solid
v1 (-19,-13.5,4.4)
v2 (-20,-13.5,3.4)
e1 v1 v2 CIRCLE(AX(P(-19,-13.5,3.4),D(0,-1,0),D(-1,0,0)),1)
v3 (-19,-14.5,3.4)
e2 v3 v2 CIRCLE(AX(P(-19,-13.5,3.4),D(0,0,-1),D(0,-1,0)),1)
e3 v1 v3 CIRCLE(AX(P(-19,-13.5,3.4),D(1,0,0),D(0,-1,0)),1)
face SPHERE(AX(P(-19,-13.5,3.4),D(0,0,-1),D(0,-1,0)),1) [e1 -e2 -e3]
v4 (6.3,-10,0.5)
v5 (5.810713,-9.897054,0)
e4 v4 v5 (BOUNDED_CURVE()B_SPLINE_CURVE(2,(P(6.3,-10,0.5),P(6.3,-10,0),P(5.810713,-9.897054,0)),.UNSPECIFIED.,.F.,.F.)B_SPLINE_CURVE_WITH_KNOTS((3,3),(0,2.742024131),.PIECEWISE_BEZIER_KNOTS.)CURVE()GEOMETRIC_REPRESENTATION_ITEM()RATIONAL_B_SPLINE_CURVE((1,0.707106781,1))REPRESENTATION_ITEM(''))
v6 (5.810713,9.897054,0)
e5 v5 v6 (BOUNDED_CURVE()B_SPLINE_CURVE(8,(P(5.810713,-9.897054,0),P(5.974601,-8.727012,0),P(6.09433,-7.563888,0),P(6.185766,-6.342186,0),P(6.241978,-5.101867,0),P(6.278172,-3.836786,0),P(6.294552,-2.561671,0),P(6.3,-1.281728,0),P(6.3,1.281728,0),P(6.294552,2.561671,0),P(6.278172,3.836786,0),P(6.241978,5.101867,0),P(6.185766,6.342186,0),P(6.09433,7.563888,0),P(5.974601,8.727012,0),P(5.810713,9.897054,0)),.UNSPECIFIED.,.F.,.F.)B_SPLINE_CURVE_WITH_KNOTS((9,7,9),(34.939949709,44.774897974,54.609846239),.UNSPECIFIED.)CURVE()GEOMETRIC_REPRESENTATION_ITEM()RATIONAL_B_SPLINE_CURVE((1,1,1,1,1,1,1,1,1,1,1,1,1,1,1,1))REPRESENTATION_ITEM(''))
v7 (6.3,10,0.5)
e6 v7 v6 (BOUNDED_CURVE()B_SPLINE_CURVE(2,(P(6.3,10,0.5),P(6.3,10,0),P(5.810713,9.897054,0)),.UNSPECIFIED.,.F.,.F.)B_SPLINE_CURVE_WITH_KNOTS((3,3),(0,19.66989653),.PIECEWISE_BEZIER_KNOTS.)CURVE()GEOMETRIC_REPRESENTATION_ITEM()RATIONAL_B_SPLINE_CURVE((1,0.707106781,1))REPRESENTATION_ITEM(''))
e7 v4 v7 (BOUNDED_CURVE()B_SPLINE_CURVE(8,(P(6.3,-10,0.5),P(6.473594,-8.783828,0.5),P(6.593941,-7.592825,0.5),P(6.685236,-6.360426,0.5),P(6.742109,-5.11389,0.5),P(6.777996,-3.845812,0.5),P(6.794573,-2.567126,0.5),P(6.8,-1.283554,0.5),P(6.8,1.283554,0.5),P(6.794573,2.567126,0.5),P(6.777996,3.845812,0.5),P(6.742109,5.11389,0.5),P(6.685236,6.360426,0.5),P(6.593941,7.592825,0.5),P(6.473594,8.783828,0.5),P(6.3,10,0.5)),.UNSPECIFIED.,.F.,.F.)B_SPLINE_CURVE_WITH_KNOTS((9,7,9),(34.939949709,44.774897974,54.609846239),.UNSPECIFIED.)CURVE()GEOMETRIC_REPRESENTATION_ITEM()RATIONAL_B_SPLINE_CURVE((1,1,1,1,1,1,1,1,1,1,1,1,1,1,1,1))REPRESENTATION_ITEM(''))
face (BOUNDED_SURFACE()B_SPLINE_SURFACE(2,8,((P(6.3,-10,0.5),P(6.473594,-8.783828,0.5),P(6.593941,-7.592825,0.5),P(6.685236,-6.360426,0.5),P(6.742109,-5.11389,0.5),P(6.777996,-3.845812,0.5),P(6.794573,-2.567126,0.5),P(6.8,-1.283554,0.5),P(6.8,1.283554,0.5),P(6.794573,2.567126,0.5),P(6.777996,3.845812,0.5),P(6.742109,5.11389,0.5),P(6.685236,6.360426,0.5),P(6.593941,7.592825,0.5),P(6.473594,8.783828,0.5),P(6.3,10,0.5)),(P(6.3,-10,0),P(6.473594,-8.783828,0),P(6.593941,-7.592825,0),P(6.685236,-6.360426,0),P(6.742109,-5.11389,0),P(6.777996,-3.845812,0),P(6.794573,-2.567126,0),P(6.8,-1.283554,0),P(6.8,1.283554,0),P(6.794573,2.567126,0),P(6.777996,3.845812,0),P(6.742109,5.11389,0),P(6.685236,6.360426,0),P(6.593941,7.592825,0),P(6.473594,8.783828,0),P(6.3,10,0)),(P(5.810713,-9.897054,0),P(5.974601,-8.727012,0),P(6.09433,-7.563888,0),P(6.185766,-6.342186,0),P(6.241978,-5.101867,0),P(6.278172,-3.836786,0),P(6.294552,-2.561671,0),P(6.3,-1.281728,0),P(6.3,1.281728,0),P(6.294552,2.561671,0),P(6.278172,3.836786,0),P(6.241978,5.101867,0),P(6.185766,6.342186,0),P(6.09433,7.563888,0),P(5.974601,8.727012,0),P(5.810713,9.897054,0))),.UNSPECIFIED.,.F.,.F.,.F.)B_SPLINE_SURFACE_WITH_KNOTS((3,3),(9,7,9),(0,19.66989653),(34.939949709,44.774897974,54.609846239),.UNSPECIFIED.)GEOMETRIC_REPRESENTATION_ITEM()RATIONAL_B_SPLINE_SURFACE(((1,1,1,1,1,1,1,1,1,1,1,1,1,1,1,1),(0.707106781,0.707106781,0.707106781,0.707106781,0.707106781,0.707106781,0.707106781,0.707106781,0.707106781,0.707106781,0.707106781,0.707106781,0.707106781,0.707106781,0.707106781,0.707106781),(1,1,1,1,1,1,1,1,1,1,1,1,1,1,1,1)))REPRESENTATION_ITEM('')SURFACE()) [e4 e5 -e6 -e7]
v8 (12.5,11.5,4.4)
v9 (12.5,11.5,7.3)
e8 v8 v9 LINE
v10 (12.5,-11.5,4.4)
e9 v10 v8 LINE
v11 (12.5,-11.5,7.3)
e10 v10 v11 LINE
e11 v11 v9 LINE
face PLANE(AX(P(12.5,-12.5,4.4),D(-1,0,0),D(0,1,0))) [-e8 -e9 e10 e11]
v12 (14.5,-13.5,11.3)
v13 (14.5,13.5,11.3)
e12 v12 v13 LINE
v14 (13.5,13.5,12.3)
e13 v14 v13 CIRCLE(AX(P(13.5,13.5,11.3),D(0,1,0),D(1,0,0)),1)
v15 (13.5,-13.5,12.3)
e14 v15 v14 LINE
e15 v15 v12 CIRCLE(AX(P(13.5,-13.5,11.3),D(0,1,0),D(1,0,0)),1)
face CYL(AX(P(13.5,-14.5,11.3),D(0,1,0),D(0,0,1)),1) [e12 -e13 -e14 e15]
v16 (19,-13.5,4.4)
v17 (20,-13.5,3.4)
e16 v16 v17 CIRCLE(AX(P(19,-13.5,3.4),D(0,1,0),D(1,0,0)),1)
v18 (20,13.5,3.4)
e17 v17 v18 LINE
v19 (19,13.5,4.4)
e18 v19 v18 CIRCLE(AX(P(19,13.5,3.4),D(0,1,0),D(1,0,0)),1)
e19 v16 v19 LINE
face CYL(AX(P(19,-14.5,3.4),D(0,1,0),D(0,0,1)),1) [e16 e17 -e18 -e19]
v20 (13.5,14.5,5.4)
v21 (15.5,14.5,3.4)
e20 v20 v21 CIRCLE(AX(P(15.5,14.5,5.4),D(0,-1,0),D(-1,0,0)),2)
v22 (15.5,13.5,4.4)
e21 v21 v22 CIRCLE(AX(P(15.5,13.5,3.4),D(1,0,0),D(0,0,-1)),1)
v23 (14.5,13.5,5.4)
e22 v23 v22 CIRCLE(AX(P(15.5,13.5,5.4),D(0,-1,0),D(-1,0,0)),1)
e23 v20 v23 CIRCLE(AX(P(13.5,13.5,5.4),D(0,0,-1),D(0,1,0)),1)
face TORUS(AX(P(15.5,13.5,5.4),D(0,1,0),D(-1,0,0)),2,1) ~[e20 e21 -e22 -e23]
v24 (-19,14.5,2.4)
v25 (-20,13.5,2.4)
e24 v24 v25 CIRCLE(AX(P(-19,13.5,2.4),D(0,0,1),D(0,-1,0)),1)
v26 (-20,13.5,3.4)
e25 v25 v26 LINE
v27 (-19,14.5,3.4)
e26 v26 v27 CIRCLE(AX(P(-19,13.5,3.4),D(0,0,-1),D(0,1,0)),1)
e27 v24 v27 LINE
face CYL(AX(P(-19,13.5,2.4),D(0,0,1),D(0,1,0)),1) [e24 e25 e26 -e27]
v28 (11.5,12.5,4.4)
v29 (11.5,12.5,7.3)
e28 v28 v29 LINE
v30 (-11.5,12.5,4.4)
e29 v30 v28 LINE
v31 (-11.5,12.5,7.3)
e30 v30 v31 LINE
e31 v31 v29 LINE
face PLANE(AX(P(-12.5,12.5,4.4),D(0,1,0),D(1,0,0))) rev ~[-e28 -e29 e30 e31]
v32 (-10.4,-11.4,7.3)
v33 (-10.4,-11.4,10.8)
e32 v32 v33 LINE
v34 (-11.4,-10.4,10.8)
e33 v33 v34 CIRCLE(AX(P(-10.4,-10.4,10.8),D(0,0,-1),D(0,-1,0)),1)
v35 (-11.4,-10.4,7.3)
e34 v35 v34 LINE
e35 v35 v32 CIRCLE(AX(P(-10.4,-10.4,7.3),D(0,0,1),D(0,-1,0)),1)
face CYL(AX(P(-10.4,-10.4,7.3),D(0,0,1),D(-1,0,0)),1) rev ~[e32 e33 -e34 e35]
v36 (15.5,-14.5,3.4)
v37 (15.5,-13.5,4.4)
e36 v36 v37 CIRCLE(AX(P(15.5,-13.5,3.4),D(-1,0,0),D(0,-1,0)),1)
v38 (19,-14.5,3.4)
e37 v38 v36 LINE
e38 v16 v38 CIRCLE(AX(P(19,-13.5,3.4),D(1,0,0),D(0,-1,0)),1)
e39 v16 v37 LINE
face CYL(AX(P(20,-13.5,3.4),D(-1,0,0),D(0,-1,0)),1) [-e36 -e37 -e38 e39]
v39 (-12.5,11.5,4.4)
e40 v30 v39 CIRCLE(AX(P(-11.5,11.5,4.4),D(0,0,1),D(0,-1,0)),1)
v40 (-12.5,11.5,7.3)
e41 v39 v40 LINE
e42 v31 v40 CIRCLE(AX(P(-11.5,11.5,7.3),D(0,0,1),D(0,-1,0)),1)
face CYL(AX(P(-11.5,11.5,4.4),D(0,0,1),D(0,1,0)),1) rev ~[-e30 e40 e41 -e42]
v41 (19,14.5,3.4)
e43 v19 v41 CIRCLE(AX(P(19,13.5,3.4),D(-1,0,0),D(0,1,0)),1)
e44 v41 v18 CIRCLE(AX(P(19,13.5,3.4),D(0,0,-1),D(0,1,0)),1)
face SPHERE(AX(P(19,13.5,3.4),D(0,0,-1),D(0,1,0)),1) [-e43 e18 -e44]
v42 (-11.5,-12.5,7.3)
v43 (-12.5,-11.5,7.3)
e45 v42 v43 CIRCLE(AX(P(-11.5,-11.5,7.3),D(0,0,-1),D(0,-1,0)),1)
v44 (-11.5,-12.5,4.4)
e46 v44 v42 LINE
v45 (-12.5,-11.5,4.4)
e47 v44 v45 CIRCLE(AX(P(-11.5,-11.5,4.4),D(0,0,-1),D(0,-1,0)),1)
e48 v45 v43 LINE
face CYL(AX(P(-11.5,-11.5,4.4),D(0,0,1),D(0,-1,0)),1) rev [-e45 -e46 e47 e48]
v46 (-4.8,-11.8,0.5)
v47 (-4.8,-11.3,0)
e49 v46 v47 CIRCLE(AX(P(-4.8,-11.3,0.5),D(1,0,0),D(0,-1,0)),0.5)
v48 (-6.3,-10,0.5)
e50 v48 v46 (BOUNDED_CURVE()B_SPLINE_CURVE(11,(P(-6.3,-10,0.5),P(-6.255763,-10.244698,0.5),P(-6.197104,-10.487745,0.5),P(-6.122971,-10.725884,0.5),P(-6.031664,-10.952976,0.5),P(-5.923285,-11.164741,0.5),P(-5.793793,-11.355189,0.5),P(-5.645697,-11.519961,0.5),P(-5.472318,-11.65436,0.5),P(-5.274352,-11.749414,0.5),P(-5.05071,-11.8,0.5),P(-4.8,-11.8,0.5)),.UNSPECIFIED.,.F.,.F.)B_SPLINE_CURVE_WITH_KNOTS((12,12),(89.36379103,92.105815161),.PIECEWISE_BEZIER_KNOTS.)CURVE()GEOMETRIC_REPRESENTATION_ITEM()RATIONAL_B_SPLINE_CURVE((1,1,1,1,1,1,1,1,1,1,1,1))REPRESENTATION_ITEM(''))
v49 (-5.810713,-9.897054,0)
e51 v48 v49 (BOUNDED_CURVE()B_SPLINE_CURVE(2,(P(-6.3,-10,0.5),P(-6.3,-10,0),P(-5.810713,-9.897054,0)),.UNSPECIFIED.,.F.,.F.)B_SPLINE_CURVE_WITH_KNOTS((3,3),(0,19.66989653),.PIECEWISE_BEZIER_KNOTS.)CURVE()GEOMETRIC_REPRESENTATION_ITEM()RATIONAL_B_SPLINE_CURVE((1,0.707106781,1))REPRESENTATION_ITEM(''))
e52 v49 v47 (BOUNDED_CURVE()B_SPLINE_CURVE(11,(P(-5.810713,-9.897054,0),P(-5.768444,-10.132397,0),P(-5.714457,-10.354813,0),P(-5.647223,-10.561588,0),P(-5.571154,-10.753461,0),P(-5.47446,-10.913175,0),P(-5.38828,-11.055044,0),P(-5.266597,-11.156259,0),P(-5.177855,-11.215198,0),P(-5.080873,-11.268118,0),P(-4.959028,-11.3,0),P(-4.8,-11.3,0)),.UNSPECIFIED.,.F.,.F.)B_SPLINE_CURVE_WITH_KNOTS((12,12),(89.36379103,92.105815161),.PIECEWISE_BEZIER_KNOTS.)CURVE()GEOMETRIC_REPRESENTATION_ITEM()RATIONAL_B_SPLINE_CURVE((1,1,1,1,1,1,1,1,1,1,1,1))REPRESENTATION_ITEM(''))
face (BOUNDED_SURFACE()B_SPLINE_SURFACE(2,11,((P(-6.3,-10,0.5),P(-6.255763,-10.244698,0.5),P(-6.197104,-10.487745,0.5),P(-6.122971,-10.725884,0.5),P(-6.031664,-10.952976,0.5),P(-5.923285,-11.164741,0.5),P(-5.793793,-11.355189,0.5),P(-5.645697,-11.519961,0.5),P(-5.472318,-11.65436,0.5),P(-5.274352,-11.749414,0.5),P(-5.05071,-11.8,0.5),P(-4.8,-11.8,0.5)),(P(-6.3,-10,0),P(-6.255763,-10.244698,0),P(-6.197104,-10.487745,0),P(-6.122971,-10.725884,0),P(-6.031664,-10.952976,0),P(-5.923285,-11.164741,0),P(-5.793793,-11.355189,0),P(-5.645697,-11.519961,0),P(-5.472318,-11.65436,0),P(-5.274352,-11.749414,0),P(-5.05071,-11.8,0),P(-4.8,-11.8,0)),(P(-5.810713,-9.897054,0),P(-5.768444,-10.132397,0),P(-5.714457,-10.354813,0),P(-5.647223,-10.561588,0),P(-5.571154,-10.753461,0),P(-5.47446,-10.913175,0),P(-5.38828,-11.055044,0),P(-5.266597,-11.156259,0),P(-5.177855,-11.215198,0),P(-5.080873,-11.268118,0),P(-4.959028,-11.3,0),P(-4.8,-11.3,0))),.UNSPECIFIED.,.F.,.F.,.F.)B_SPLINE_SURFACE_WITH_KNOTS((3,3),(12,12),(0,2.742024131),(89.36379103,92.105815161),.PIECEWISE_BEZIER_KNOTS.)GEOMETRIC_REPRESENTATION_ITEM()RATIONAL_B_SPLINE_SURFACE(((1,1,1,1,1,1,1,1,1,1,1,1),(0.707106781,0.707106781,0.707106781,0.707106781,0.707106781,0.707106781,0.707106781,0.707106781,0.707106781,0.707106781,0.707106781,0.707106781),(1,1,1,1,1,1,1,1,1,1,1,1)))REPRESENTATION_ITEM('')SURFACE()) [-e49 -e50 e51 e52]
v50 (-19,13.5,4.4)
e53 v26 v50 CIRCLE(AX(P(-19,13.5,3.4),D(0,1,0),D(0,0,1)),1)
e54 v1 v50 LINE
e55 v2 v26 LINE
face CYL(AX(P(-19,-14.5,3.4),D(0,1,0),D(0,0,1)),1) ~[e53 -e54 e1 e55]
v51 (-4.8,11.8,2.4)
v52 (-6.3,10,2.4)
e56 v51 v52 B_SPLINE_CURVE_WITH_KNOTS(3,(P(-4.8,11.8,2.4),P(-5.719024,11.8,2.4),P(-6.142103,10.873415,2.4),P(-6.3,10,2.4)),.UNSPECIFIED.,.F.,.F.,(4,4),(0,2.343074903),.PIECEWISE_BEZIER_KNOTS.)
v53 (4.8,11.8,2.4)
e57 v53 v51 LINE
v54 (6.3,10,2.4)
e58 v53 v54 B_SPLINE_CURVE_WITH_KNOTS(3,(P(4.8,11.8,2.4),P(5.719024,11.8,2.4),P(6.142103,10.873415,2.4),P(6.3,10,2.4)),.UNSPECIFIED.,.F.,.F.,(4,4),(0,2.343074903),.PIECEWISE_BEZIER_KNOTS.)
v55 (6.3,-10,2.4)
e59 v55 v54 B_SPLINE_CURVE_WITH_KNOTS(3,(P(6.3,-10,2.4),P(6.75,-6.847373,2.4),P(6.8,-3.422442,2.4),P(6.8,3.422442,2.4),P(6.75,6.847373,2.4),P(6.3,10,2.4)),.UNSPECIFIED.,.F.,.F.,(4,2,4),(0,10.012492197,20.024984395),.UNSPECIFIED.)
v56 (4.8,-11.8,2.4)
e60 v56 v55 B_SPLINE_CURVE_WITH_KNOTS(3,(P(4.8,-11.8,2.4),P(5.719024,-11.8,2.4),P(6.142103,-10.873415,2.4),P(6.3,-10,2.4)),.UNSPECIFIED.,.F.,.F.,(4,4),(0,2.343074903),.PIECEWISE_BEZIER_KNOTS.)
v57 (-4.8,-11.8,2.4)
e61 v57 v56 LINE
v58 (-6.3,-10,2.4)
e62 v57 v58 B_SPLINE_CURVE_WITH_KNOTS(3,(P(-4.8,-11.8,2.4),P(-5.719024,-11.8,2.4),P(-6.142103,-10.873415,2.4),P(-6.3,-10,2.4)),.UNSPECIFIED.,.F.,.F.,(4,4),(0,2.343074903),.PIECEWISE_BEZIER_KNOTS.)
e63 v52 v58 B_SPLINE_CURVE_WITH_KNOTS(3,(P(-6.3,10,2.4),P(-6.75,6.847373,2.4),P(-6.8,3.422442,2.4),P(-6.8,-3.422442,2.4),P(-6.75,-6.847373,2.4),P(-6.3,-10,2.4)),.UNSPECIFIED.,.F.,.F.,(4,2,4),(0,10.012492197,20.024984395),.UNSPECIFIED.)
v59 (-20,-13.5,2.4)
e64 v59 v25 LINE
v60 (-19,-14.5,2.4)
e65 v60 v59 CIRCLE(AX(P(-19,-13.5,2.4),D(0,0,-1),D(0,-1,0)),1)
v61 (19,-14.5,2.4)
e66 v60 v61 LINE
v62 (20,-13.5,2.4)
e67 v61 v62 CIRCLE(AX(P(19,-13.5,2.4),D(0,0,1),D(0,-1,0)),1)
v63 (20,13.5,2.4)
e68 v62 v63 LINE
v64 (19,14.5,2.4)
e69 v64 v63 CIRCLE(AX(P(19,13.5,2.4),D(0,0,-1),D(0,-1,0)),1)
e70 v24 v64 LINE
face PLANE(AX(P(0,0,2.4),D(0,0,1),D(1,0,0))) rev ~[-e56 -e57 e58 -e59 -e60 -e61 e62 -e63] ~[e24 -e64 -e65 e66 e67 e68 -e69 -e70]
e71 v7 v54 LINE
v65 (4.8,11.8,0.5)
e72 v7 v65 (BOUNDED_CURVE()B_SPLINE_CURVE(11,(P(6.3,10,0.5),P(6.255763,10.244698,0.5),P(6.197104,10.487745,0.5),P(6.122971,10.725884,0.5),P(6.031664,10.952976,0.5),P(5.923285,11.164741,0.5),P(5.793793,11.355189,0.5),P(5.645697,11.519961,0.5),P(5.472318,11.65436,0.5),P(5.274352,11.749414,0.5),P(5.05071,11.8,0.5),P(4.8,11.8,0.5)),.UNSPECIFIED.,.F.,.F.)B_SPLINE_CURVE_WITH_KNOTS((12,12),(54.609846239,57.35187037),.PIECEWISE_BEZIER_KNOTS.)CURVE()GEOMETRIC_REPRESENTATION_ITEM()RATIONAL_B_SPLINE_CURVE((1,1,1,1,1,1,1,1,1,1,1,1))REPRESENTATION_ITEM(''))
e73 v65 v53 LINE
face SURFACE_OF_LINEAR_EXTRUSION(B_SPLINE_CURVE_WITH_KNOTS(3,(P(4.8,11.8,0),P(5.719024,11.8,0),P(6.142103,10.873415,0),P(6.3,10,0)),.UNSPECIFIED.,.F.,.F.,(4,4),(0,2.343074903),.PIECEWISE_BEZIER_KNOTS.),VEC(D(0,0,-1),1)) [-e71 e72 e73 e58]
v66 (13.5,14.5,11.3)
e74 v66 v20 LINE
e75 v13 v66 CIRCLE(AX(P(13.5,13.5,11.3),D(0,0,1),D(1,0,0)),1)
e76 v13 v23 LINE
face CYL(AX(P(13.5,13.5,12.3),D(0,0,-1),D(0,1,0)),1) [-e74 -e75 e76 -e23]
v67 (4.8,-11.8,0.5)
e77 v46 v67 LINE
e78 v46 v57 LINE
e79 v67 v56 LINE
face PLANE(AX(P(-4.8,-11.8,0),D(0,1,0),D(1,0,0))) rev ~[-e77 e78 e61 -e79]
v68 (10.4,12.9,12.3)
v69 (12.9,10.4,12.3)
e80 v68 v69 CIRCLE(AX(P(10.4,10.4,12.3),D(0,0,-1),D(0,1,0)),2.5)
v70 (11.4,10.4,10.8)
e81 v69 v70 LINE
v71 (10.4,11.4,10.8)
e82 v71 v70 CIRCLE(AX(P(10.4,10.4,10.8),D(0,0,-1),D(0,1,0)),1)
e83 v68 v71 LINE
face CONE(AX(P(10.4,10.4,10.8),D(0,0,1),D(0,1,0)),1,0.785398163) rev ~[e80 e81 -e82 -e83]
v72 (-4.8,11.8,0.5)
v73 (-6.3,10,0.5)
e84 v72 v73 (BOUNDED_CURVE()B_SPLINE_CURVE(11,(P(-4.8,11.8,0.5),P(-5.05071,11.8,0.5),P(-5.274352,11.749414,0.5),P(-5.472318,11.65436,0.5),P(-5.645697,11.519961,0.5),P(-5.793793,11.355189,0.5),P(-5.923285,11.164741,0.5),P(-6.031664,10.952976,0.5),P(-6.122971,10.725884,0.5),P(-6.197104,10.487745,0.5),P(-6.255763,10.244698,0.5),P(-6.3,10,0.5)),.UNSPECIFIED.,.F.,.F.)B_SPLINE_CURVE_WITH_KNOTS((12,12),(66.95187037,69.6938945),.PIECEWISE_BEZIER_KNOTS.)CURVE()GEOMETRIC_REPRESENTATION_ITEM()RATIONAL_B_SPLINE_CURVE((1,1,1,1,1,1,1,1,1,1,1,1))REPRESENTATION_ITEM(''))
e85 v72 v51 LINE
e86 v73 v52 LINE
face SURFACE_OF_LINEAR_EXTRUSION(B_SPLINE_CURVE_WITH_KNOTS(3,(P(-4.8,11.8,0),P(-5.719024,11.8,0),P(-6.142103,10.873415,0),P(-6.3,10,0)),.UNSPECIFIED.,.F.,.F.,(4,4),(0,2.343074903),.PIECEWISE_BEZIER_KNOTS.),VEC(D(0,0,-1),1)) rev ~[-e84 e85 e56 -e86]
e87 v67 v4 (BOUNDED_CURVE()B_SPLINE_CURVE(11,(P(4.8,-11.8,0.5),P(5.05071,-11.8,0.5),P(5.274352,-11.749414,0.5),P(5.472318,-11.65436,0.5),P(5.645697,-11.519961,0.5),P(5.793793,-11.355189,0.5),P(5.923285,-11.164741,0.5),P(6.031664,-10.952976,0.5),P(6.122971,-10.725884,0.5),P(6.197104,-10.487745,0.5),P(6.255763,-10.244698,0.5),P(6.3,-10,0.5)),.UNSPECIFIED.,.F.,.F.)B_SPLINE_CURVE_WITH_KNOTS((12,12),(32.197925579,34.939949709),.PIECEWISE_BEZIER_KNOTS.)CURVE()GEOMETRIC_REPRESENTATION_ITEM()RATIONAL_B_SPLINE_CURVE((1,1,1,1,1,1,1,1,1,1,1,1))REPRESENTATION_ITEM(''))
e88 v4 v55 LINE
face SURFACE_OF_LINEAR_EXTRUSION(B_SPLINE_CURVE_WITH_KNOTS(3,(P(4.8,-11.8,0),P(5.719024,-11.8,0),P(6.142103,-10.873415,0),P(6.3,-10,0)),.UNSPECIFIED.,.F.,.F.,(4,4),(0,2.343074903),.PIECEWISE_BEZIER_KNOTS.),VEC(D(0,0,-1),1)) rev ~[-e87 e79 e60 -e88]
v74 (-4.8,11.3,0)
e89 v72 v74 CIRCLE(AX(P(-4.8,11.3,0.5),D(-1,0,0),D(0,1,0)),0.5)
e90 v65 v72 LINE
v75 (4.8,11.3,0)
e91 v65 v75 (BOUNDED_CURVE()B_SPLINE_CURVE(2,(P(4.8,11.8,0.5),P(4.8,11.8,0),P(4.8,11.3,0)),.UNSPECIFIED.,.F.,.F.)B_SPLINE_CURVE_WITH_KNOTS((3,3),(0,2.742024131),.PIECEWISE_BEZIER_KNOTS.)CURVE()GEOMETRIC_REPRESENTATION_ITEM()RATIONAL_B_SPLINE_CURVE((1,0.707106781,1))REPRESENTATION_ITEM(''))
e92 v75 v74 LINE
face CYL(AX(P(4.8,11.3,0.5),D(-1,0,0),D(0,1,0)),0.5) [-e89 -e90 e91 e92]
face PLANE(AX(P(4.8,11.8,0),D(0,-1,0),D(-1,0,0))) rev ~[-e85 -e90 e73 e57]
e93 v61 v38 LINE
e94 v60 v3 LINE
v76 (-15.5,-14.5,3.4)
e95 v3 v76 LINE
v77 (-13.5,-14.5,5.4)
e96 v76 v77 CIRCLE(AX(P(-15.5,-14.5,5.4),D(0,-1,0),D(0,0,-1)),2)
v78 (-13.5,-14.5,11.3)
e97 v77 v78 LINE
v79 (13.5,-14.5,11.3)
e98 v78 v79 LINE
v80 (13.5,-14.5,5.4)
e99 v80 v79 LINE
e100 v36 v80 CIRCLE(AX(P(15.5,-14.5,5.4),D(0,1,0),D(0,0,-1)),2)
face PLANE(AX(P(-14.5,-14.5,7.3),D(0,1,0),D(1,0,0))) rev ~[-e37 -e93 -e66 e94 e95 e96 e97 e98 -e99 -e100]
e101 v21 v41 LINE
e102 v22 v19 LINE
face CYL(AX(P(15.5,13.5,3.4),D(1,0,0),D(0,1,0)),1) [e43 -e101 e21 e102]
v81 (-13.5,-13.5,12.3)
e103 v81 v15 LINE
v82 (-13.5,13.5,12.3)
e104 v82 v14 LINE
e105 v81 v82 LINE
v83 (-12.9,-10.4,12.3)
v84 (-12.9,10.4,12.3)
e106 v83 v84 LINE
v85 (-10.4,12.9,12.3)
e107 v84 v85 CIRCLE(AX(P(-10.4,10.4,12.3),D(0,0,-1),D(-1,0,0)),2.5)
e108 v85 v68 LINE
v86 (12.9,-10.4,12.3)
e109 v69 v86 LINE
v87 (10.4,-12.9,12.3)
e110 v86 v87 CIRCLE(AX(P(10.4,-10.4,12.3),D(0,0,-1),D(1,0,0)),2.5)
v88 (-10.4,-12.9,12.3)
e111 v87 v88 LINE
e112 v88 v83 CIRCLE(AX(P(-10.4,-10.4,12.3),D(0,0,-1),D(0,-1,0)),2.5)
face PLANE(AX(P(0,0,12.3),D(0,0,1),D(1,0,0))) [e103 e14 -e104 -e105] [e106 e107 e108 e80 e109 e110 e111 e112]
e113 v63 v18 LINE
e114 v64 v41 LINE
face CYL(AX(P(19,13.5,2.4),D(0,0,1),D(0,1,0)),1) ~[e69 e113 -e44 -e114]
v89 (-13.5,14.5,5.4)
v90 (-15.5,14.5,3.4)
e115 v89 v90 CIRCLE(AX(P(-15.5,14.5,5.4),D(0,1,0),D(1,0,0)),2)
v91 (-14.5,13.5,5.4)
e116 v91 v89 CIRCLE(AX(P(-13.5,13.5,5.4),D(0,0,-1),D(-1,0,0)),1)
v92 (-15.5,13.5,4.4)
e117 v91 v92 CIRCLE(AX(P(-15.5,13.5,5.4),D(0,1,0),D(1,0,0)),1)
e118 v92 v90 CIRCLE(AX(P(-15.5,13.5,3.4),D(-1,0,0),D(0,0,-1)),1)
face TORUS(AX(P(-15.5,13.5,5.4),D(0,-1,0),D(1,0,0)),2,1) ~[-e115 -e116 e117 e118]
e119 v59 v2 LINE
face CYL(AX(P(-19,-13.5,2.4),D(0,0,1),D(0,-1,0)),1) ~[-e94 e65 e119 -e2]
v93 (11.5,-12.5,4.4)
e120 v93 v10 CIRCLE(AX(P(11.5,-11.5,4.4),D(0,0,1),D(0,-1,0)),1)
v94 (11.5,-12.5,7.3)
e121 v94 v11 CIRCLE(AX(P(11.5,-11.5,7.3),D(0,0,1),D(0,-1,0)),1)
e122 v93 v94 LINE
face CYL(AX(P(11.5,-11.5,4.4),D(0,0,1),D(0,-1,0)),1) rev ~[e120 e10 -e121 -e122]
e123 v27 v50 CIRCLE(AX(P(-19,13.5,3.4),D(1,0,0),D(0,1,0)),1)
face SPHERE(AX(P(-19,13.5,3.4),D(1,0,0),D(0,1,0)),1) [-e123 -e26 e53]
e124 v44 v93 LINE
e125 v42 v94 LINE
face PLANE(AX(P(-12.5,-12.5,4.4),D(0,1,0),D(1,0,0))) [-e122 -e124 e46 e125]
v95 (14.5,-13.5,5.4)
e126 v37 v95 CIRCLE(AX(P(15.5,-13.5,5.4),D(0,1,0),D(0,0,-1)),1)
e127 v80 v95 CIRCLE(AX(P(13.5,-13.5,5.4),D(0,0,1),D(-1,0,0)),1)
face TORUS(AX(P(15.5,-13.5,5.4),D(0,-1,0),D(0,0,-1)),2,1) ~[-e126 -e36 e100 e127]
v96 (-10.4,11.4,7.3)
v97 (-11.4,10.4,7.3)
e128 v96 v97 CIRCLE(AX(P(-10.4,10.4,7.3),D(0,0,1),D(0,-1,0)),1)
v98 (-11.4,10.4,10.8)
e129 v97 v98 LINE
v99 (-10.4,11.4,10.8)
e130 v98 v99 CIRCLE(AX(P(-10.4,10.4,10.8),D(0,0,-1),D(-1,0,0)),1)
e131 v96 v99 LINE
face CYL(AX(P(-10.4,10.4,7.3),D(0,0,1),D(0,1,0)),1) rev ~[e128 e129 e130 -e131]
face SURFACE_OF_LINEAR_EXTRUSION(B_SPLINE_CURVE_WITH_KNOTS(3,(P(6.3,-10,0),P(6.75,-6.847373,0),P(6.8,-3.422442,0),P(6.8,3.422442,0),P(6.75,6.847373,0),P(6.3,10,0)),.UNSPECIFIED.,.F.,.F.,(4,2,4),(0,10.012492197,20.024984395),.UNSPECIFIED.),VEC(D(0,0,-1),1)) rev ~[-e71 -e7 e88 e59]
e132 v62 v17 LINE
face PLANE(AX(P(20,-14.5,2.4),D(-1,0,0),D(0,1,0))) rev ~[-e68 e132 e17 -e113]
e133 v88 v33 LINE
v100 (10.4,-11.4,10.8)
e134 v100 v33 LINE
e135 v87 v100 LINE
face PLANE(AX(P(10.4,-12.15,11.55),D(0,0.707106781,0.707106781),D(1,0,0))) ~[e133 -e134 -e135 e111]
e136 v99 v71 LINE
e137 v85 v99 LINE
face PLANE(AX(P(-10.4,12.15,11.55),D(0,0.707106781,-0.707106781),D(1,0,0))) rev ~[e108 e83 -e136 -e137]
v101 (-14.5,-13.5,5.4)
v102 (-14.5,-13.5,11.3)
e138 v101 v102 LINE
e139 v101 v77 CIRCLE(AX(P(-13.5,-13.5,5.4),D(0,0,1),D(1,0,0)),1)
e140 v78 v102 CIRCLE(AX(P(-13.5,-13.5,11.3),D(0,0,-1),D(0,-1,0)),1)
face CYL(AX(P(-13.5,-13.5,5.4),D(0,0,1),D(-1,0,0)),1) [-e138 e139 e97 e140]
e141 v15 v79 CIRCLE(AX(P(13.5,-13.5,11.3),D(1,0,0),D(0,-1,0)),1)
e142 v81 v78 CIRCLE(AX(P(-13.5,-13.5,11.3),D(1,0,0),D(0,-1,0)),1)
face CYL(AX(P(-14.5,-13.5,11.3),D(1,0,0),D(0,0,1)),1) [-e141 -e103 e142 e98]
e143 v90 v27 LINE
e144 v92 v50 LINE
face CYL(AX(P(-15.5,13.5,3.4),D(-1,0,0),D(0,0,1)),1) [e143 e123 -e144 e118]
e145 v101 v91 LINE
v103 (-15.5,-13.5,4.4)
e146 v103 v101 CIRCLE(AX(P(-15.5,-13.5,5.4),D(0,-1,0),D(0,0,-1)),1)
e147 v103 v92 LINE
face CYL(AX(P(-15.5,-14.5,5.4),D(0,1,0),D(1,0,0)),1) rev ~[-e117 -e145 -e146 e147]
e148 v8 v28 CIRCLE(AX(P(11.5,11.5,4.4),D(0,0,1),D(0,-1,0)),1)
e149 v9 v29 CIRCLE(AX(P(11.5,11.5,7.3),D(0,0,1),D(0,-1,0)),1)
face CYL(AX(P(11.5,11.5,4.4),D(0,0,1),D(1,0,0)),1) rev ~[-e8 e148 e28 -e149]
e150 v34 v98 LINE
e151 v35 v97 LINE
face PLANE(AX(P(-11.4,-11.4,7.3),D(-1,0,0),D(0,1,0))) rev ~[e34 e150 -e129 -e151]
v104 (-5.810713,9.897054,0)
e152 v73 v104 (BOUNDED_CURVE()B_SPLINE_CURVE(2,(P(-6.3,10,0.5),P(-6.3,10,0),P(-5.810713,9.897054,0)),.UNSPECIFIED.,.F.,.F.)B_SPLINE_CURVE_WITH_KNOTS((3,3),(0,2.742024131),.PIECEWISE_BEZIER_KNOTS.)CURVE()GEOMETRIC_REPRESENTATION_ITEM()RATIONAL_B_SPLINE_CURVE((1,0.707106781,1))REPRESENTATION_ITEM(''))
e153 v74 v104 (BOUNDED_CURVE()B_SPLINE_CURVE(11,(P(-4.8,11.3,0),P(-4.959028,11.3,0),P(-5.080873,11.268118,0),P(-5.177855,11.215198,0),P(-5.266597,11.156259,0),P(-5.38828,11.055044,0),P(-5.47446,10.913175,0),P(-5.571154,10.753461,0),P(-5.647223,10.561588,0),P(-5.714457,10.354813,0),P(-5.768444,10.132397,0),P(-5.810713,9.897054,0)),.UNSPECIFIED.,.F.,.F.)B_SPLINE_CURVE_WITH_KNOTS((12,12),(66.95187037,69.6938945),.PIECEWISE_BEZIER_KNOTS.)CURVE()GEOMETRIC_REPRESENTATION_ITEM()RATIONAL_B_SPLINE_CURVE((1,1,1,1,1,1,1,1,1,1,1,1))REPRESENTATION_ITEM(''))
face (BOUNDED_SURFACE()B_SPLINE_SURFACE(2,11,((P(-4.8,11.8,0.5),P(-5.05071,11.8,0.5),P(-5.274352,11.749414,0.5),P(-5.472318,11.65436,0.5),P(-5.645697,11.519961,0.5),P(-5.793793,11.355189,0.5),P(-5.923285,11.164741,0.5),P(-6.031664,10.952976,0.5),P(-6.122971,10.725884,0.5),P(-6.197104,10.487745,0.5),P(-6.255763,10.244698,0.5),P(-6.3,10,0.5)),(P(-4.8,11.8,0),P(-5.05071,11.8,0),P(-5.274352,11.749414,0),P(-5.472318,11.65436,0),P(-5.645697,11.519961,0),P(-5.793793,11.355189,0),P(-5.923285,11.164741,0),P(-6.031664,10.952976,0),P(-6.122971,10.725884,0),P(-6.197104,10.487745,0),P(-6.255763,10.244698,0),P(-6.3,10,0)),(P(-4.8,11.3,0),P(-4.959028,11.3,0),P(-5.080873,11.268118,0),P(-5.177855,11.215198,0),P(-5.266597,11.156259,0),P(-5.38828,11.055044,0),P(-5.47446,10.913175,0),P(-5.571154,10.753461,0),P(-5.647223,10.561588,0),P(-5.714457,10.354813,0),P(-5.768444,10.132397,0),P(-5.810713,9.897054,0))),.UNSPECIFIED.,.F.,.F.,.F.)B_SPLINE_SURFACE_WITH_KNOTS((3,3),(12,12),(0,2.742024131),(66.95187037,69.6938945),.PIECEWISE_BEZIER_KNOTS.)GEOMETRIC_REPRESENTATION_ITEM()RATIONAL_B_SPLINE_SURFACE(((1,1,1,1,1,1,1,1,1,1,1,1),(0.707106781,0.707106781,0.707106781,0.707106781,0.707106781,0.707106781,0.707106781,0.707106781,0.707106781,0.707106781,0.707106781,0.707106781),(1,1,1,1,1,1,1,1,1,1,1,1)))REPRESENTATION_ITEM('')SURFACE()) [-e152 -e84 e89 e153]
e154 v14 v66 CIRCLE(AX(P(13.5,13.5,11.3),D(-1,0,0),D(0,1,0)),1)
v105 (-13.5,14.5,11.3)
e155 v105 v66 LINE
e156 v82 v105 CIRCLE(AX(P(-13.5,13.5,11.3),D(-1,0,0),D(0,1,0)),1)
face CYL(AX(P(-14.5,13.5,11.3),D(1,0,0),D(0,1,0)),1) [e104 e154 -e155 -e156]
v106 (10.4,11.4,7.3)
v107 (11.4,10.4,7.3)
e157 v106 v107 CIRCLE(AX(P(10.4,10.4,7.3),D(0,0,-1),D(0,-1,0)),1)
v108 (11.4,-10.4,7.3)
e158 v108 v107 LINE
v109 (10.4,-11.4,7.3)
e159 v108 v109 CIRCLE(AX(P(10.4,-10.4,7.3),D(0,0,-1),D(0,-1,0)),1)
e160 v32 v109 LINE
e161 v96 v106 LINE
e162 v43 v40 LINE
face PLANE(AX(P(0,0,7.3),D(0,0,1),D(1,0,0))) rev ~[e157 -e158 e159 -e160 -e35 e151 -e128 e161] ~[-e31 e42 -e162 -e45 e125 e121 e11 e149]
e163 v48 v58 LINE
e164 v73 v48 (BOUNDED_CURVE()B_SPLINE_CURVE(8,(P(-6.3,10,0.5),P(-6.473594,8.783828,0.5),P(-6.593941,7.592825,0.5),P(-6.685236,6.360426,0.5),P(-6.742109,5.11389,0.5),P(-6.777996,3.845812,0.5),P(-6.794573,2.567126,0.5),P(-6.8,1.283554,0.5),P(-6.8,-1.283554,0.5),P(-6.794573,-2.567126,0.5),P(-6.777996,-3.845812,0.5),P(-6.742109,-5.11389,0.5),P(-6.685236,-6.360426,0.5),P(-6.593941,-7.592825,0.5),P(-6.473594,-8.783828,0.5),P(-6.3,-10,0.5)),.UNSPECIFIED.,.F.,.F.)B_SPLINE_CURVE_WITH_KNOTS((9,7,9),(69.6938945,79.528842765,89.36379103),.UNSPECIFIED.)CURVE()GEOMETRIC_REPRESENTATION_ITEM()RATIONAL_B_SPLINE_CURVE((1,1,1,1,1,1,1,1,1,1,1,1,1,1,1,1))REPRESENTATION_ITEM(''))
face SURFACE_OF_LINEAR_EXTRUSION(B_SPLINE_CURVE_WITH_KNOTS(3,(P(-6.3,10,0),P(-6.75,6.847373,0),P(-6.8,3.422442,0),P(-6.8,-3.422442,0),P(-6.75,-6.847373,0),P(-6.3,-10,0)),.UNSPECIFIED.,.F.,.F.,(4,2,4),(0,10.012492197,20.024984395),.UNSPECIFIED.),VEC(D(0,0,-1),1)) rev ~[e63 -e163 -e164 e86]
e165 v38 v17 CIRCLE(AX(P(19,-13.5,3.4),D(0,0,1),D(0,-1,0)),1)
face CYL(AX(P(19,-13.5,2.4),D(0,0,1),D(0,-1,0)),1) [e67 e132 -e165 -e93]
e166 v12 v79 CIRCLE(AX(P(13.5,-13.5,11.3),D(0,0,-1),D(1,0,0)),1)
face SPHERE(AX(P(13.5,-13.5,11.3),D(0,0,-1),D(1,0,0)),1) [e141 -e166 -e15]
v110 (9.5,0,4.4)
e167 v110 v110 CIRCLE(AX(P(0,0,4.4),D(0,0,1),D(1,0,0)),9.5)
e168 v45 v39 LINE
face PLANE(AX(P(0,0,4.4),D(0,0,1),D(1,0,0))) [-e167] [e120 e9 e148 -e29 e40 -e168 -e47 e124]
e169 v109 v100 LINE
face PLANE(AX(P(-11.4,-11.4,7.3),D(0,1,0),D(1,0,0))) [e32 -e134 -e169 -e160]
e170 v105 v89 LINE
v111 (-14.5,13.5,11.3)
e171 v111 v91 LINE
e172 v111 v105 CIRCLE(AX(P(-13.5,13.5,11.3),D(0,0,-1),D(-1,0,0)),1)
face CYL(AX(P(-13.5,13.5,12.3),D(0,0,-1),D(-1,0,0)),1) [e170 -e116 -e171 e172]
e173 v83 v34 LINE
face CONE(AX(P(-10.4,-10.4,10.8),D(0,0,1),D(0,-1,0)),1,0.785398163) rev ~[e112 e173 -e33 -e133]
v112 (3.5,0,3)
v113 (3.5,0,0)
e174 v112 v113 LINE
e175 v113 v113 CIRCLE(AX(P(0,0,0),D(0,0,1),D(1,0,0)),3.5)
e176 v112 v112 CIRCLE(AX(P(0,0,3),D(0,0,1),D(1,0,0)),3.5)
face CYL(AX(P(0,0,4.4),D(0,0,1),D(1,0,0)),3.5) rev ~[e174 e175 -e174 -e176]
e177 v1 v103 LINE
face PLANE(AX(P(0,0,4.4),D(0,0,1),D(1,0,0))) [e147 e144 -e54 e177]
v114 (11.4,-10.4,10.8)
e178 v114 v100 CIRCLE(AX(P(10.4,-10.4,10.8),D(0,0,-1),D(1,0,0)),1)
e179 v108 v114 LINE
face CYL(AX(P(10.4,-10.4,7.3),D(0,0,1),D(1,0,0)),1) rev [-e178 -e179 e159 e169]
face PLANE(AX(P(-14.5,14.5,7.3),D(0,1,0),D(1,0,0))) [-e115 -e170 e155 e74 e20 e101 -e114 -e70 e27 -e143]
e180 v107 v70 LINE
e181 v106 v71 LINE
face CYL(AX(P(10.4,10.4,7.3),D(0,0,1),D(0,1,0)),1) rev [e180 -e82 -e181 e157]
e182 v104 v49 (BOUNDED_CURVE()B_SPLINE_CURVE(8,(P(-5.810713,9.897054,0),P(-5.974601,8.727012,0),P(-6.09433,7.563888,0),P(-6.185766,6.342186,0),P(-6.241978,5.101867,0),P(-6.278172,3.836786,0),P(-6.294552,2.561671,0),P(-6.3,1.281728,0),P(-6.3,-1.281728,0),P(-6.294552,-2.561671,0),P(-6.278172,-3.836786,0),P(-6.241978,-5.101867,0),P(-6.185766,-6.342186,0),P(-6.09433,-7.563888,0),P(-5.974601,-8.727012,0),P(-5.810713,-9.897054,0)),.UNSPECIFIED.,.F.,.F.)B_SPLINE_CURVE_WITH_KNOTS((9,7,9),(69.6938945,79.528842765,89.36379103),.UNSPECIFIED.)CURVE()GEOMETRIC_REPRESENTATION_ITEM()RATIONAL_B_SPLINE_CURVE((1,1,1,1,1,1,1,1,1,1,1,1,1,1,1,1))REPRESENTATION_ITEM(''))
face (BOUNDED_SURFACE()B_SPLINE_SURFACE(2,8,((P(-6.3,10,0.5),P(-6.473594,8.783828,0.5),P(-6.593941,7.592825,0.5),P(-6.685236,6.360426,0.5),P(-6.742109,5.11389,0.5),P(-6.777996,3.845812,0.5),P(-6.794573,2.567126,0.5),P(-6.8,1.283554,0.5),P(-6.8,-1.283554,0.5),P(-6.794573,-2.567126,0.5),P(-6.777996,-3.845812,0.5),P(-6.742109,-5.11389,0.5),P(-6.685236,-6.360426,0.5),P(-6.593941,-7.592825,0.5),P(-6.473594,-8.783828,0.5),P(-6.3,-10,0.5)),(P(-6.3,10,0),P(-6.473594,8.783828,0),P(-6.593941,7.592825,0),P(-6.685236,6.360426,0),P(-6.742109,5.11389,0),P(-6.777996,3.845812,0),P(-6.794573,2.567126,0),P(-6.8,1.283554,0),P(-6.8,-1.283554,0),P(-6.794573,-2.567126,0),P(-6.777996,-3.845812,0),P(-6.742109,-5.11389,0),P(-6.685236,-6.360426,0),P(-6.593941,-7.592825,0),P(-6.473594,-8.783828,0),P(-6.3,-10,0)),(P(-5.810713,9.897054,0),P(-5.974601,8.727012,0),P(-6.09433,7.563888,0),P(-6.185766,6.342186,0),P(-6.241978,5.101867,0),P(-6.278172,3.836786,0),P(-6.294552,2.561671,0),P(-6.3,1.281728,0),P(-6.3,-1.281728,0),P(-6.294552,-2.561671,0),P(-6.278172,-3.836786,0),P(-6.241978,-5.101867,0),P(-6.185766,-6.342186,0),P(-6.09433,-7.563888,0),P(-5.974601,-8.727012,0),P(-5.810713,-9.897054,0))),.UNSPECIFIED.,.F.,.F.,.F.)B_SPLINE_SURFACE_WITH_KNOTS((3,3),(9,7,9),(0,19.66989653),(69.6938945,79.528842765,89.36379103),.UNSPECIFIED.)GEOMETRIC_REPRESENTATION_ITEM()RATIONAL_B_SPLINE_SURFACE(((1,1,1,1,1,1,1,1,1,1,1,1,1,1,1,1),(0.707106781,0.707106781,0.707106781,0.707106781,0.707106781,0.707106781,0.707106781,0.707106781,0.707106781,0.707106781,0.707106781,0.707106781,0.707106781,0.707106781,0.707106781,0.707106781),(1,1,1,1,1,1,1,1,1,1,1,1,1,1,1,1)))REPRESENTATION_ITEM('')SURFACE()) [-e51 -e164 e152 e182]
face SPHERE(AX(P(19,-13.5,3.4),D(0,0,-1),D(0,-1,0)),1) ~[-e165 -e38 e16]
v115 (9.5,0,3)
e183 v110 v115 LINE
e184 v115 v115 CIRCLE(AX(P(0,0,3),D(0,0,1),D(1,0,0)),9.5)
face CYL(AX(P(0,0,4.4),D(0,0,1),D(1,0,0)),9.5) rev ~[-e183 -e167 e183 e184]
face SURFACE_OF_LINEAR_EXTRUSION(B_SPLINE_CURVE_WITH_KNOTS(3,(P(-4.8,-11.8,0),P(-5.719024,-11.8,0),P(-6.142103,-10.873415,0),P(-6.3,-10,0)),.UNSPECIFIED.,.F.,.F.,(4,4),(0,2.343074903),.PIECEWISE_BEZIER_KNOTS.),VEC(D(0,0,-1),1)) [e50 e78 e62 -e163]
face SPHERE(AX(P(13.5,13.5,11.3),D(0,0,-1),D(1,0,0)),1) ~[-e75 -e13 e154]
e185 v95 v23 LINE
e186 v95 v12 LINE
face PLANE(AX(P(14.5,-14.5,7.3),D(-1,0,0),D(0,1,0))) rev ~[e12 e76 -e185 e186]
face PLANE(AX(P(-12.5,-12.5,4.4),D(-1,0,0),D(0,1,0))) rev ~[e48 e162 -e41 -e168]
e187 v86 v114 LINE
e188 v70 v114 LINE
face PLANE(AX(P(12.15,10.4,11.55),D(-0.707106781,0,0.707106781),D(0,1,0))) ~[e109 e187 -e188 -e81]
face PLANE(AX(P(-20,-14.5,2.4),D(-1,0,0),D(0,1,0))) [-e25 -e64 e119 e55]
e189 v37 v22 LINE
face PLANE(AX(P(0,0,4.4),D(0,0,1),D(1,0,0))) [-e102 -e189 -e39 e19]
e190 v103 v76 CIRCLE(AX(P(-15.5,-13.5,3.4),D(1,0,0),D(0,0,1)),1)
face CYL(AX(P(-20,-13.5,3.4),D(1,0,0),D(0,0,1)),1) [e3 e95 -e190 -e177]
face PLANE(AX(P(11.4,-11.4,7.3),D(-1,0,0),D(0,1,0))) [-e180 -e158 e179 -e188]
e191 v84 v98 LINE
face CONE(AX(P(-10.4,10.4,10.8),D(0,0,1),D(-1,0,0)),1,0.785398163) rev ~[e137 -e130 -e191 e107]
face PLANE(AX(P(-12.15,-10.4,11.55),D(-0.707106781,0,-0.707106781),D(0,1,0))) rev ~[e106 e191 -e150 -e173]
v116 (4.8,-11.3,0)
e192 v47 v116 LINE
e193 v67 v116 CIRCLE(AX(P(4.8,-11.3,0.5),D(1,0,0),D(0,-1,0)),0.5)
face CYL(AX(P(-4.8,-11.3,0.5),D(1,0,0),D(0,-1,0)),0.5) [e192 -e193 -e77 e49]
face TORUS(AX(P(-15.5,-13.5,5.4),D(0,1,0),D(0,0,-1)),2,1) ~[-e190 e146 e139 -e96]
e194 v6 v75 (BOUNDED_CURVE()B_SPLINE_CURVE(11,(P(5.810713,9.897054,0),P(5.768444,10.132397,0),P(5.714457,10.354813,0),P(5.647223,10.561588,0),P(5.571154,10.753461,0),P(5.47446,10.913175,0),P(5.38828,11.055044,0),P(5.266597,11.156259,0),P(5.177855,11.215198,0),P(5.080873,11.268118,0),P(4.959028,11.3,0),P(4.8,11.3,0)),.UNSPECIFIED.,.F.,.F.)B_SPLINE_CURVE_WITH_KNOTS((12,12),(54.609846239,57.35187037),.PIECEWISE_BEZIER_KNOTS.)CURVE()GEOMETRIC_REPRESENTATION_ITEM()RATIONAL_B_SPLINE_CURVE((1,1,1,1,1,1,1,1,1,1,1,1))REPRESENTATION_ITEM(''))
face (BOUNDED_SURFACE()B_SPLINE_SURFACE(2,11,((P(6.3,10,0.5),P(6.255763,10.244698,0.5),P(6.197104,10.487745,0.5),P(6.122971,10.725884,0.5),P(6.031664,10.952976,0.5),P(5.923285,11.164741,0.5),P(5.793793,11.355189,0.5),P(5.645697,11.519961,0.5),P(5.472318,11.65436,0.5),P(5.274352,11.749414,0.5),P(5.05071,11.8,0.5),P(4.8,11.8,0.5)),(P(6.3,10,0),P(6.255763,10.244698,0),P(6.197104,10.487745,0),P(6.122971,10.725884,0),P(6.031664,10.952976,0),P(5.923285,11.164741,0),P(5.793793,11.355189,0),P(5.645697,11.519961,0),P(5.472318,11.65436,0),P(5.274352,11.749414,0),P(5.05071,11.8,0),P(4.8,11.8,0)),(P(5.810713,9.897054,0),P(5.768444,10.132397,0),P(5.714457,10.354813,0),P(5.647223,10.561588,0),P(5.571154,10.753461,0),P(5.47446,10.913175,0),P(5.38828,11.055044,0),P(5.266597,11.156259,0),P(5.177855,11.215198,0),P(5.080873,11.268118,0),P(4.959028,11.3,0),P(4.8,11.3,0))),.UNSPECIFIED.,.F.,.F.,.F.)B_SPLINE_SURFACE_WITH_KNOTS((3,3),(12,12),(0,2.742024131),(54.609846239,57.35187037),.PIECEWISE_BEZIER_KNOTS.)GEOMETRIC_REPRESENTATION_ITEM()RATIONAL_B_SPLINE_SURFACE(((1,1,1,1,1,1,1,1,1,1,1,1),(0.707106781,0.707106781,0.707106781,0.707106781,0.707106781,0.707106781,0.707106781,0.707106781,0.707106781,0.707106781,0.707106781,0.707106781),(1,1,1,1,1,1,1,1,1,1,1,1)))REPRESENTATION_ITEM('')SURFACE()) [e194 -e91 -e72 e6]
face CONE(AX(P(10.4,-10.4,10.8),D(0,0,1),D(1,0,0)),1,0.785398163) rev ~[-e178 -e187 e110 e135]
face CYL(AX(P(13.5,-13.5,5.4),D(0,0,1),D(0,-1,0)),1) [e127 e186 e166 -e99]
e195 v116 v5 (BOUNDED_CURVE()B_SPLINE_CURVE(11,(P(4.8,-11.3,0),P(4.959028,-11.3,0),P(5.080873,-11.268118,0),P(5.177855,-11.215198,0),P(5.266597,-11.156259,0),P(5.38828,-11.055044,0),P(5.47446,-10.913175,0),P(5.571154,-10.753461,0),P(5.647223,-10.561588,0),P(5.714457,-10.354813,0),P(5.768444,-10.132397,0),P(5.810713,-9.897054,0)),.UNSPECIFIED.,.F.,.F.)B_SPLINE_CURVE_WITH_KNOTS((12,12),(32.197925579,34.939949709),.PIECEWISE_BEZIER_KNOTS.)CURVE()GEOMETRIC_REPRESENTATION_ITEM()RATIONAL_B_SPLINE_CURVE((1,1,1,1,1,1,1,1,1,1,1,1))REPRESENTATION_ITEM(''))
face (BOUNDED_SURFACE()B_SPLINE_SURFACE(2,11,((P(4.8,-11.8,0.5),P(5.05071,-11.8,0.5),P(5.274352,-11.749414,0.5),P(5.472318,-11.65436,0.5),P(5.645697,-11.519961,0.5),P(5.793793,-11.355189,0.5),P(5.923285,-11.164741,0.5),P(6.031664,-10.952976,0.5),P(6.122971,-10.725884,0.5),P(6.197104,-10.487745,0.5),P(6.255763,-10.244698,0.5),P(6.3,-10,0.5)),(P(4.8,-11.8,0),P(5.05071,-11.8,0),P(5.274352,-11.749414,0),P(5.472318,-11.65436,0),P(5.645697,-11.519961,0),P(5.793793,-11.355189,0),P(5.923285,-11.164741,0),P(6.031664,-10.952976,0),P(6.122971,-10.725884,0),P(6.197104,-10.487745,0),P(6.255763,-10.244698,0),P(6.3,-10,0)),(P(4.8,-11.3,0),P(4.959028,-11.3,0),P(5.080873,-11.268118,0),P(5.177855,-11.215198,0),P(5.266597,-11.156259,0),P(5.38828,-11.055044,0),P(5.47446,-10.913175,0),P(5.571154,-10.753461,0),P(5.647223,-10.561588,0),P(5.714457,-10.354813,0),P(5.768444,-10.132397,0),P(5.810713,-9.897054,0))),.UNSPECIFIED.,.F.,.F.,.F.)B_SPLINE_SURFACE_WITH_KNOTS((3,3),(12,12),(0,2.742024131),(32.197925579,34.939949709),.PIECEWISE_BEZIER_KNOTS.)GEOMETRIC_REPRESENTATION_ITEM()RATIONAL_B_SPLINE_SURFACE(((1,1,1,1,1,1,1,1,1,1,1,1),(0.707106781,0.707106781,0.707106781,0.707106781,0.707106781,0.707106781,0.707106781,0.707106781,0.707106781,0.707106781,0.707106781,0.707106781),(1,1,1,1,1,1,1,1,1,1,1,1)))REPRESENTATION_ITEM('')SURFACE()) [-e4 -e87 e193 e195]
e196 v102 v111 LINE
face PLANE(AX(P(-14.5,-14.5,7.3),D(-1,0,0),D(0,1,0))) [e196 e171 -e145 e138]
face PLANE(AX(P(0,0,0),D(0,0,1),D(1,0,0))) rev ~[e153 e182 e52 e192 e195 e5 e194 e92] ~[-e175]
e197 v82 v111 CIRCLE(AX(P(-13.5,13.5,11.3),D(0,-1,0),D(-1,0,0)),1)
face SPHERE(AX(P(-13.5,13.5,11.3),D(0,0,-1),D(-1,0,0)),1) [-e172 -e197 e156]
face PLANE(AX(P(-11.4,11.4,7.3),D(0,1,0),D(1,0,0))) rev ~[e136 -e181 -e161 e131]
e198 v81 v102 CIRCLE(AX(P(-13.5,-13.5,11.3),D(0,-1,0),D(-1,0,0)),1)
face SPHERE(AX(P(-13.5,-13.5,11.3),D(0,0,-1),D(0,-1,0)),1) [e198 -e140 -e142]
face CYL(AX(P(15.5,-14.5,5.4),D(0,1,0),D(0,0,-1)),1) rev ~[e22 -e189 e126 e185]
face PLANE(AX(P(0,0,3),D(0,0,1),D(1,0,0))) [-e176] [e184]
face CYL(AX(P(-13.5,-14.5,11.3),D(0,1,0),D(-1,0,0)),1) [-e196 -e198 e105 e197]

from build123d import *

# Parameters (mm, degrees)
F1_DEPTH  = 2.4
F2_W      = 40
F2_H      = 29
F3_DEPTH  = 2
F4_R      = 9.5
F4_R_2    = 3.5
F5_DEPTH  = 1.4
F6_DEPTH  = 4.4010001
F7_W      = 29
F7_H      = 29
F7_W_2    = 25
F7_H_2    = 25
F8_DEPTH  = 2.9
F9_W      = 29
F9_H      = 29
F9_W_2    = 22.8
F9_H_2    = 22.8
F10_DEPTH = 5
F11_F1_R  = 1
F11_F2_R  = 1
F12_SIZE  = 1.5
F13_R     = 0.5


with BuildPart() as f1:
    # F0 (on Top) → F1 (new body)
    with BuildSketch(Plane.XY):
        with BuildLine():
            Line((0, 11.8), (-4.8, 11.8))
            add(Edge.make_bspline(
                [(-4.8, 11.8), (-5.7190243266, 11.8), (-6.1421032596, 10.873414806), (-6.3, 10)],
                knots=[0, 0, 0, 0, 2.3430749028, 2.3430749028, 2.3430749028, 2.3430749028], degree=3))
            add(Edge.make_bspline(
                [(-6.3, 10), (-6.75, 6.8473730727), (-6.8, 3.4224423006), (-6.8, 0)],
                knots=[0, 0, 0, 0, 10.0124921973, 10.0124921973, 10.0124921973, 10.0124921973], degree=3))
            add(Edge.make_bspline(
                [(-6.3, -10), (-6.75, -6.8473730727), (-6.8, -3.4224423006), (-6.8, 0)],
                knots=[0, 0, 0, 0, 10.0124921973, 10.0124921973, 10.0124921973, 10.0124921973], degree=3))
            add(Edge.make_bspline(
                [(-4.8, -11.8), (-5.7190243266, -11.8), (-6.1421032596, -10.873414806), (-6.3, -10)],
                knots=[0, 0, 0, 0, 2.3430749028, 2.3430749028, 2.3430749028, 2.3430749028], degree=3))
            Line((-4.8, -11.8), (0, -11.8))
            Line((0, -11.8), (4.8, -11.8))
            add(Edge.make_bspline(
                [(4.8, -11.8), (5.7190243266, -11.8), (6.1421032596, -10.873414806), (6.3, -10)],
                knots=[0, 0, 0, 0, 2.3430749028, 2.3430749028, 2.3430749028, 2.3430749028], degree=3))
            add(Edge.make_bspline(
                [(6.3, -10), (6.75, -6.8473730727), (6.8, -3.4224423006), (6.8, 0)],
                knots=[0, 0, 0, 0, 10.0124921973, 10.0124921973, 10.0124921973, 10.0124921973], degree=3))
            add(Edge.make_bspline(
                [(6.3, 10), (6.75, 6.8473730727), (6.8, 3.4224423006), (6.8, 0)],
                knots=[0, 0, 0, 0, 10.0124921973, 10.0124921973, 10.0124921973, 10.0124921973], degree=3))
            add(Edge.make_bspline(
                [(4.8, 11.8), (5.7190243266, 11.8), (6.1421032596, 10.873414806), (6.3, 10)],
                knots=[0, 0, 0, 0, 2.3430749028, 2.3430749028, 2.3430749028, 2.3430749028], degree=3))
            Line((4.8, 11.8), (0, 11.8))
        make_face()
    extrude(amount=F1_DEPTH)

    # F2 (on face) → F3 (join)
    with BuildSketch(Plane.XY.offset(2.4)):
        Rectangle(F2_W, F2_H)
    extrude(amount=F3_DEPTH)

    # F4 (on face) → F5 (cut)
    with BuildSketch(Plane.XY.offset(4.4)):
        Circle(F4_R)
        Circle(F4_R_2, mode=Mode.SUBTRACT)
    extrude(amount=-F5_DEPTH, mode=Mode.SUBTRACT)

    # F6 (cut, through all): a face of the model
    f6_faces = [f1.faces().sort_by_distance(p)[0] for p in [
        (0, 0, 4.4),
    ]]
    extrude(f6_faces, amount=-F6_DEPTH, mode=Mode.SUBTRACT)

    # F7 (on face) → F8 (join)
    with BuildSketch(Plane.XY.offset(4.4)):
        Rectangle(F7_W, F7_H)
        Rectangle(F7_W_2, F7_H_2, mode=Mode.SUBTRACT)
    extrude(amount=F8_DEPTH)

    # F9 (on face) → F10 (join)
    with BuildSketch(Plane.XY.offset(7.3)):
        Rectangle(F9_W, F9_H)
        Rectangle(F9_W_2, F9_H_2, mode=Mode.SUBTRACT)
    extrude(amount=F10_DEPTH)

    # F11: fillet of radius 1 on 24 edges, made by hand

    # F11_f1
    f11_f1_edges = [f1.edges().sort_by_distance(p)[0] for p in [
        (12.5, -12.5, 5.85),
        (11.4, 11.4, 9.8),
        (12.5, 12.5, 5.85),
        (-12.5, -12.5, 5.85),
        (-11.4, -11.4, 9.8),
        (-12.5, 12.5, 5.85),
        (14.5, 0, 4.4),
        (-14.5, 0, 4.4),
        (11.4, -11.4, 9.8),
        (-11.4, 11.4, 9.8),
    ]]
    fillet(f11_f1_edges, radius=F11_F1_R)

    # F11_f2
    f11_f2_edges = [f1.edges().sort_by_distance(p)[0] for p in [
        (-20, -14.5, 3.4),
        (20, -14.5, 3.4),
        (14.5, -14.5, 8.85),
        (-14.5, -14.5, 8.85),
        (-14.5, 14.5, 8.85),
        (-20, 14.5, 3.4),
        (20, 14.5, 3.4),
        (14.5, 14.5, 8.85),
        (-20, 0, 4.4),
        (20, 0, 4.4),
        (14.5, 0, 12.3),
        (0, -14.5, 12.3),
        (-14.5, 0, 12.3),
        (0, 14.5, 12.3),
        (14.7928932188, 14.5, 4.6928932188),
        (-14.7928932188, 14.5, 4.6928932188),
        (-14.7928932188, -14.5, 4.6928932188),
        (14.7928932188, -14.5, 4.6928932188),
    ]]
    fillet(f11_f2_edges, radius=F11_F2_R)

    # F12
    f12_edges = [f1.edges().sort_by_distance(p)[0] for p in [
        (0, 11.4, 12.3),
    ]]
    chamfer(f12_edges, length=F12_SIZE)

    # F13
    f13_edges = [f1.edges().sort_by_distance(p)[0] for p in [
        (-6.722447, -5.009541, 0),
        (0, -11.8, 0),
        (0, 11.8, 0),
        (6.722447, 5.009541, 0),
    ]]
    fillet(f13_edges, radius=F13_R)


solid = f1.part
